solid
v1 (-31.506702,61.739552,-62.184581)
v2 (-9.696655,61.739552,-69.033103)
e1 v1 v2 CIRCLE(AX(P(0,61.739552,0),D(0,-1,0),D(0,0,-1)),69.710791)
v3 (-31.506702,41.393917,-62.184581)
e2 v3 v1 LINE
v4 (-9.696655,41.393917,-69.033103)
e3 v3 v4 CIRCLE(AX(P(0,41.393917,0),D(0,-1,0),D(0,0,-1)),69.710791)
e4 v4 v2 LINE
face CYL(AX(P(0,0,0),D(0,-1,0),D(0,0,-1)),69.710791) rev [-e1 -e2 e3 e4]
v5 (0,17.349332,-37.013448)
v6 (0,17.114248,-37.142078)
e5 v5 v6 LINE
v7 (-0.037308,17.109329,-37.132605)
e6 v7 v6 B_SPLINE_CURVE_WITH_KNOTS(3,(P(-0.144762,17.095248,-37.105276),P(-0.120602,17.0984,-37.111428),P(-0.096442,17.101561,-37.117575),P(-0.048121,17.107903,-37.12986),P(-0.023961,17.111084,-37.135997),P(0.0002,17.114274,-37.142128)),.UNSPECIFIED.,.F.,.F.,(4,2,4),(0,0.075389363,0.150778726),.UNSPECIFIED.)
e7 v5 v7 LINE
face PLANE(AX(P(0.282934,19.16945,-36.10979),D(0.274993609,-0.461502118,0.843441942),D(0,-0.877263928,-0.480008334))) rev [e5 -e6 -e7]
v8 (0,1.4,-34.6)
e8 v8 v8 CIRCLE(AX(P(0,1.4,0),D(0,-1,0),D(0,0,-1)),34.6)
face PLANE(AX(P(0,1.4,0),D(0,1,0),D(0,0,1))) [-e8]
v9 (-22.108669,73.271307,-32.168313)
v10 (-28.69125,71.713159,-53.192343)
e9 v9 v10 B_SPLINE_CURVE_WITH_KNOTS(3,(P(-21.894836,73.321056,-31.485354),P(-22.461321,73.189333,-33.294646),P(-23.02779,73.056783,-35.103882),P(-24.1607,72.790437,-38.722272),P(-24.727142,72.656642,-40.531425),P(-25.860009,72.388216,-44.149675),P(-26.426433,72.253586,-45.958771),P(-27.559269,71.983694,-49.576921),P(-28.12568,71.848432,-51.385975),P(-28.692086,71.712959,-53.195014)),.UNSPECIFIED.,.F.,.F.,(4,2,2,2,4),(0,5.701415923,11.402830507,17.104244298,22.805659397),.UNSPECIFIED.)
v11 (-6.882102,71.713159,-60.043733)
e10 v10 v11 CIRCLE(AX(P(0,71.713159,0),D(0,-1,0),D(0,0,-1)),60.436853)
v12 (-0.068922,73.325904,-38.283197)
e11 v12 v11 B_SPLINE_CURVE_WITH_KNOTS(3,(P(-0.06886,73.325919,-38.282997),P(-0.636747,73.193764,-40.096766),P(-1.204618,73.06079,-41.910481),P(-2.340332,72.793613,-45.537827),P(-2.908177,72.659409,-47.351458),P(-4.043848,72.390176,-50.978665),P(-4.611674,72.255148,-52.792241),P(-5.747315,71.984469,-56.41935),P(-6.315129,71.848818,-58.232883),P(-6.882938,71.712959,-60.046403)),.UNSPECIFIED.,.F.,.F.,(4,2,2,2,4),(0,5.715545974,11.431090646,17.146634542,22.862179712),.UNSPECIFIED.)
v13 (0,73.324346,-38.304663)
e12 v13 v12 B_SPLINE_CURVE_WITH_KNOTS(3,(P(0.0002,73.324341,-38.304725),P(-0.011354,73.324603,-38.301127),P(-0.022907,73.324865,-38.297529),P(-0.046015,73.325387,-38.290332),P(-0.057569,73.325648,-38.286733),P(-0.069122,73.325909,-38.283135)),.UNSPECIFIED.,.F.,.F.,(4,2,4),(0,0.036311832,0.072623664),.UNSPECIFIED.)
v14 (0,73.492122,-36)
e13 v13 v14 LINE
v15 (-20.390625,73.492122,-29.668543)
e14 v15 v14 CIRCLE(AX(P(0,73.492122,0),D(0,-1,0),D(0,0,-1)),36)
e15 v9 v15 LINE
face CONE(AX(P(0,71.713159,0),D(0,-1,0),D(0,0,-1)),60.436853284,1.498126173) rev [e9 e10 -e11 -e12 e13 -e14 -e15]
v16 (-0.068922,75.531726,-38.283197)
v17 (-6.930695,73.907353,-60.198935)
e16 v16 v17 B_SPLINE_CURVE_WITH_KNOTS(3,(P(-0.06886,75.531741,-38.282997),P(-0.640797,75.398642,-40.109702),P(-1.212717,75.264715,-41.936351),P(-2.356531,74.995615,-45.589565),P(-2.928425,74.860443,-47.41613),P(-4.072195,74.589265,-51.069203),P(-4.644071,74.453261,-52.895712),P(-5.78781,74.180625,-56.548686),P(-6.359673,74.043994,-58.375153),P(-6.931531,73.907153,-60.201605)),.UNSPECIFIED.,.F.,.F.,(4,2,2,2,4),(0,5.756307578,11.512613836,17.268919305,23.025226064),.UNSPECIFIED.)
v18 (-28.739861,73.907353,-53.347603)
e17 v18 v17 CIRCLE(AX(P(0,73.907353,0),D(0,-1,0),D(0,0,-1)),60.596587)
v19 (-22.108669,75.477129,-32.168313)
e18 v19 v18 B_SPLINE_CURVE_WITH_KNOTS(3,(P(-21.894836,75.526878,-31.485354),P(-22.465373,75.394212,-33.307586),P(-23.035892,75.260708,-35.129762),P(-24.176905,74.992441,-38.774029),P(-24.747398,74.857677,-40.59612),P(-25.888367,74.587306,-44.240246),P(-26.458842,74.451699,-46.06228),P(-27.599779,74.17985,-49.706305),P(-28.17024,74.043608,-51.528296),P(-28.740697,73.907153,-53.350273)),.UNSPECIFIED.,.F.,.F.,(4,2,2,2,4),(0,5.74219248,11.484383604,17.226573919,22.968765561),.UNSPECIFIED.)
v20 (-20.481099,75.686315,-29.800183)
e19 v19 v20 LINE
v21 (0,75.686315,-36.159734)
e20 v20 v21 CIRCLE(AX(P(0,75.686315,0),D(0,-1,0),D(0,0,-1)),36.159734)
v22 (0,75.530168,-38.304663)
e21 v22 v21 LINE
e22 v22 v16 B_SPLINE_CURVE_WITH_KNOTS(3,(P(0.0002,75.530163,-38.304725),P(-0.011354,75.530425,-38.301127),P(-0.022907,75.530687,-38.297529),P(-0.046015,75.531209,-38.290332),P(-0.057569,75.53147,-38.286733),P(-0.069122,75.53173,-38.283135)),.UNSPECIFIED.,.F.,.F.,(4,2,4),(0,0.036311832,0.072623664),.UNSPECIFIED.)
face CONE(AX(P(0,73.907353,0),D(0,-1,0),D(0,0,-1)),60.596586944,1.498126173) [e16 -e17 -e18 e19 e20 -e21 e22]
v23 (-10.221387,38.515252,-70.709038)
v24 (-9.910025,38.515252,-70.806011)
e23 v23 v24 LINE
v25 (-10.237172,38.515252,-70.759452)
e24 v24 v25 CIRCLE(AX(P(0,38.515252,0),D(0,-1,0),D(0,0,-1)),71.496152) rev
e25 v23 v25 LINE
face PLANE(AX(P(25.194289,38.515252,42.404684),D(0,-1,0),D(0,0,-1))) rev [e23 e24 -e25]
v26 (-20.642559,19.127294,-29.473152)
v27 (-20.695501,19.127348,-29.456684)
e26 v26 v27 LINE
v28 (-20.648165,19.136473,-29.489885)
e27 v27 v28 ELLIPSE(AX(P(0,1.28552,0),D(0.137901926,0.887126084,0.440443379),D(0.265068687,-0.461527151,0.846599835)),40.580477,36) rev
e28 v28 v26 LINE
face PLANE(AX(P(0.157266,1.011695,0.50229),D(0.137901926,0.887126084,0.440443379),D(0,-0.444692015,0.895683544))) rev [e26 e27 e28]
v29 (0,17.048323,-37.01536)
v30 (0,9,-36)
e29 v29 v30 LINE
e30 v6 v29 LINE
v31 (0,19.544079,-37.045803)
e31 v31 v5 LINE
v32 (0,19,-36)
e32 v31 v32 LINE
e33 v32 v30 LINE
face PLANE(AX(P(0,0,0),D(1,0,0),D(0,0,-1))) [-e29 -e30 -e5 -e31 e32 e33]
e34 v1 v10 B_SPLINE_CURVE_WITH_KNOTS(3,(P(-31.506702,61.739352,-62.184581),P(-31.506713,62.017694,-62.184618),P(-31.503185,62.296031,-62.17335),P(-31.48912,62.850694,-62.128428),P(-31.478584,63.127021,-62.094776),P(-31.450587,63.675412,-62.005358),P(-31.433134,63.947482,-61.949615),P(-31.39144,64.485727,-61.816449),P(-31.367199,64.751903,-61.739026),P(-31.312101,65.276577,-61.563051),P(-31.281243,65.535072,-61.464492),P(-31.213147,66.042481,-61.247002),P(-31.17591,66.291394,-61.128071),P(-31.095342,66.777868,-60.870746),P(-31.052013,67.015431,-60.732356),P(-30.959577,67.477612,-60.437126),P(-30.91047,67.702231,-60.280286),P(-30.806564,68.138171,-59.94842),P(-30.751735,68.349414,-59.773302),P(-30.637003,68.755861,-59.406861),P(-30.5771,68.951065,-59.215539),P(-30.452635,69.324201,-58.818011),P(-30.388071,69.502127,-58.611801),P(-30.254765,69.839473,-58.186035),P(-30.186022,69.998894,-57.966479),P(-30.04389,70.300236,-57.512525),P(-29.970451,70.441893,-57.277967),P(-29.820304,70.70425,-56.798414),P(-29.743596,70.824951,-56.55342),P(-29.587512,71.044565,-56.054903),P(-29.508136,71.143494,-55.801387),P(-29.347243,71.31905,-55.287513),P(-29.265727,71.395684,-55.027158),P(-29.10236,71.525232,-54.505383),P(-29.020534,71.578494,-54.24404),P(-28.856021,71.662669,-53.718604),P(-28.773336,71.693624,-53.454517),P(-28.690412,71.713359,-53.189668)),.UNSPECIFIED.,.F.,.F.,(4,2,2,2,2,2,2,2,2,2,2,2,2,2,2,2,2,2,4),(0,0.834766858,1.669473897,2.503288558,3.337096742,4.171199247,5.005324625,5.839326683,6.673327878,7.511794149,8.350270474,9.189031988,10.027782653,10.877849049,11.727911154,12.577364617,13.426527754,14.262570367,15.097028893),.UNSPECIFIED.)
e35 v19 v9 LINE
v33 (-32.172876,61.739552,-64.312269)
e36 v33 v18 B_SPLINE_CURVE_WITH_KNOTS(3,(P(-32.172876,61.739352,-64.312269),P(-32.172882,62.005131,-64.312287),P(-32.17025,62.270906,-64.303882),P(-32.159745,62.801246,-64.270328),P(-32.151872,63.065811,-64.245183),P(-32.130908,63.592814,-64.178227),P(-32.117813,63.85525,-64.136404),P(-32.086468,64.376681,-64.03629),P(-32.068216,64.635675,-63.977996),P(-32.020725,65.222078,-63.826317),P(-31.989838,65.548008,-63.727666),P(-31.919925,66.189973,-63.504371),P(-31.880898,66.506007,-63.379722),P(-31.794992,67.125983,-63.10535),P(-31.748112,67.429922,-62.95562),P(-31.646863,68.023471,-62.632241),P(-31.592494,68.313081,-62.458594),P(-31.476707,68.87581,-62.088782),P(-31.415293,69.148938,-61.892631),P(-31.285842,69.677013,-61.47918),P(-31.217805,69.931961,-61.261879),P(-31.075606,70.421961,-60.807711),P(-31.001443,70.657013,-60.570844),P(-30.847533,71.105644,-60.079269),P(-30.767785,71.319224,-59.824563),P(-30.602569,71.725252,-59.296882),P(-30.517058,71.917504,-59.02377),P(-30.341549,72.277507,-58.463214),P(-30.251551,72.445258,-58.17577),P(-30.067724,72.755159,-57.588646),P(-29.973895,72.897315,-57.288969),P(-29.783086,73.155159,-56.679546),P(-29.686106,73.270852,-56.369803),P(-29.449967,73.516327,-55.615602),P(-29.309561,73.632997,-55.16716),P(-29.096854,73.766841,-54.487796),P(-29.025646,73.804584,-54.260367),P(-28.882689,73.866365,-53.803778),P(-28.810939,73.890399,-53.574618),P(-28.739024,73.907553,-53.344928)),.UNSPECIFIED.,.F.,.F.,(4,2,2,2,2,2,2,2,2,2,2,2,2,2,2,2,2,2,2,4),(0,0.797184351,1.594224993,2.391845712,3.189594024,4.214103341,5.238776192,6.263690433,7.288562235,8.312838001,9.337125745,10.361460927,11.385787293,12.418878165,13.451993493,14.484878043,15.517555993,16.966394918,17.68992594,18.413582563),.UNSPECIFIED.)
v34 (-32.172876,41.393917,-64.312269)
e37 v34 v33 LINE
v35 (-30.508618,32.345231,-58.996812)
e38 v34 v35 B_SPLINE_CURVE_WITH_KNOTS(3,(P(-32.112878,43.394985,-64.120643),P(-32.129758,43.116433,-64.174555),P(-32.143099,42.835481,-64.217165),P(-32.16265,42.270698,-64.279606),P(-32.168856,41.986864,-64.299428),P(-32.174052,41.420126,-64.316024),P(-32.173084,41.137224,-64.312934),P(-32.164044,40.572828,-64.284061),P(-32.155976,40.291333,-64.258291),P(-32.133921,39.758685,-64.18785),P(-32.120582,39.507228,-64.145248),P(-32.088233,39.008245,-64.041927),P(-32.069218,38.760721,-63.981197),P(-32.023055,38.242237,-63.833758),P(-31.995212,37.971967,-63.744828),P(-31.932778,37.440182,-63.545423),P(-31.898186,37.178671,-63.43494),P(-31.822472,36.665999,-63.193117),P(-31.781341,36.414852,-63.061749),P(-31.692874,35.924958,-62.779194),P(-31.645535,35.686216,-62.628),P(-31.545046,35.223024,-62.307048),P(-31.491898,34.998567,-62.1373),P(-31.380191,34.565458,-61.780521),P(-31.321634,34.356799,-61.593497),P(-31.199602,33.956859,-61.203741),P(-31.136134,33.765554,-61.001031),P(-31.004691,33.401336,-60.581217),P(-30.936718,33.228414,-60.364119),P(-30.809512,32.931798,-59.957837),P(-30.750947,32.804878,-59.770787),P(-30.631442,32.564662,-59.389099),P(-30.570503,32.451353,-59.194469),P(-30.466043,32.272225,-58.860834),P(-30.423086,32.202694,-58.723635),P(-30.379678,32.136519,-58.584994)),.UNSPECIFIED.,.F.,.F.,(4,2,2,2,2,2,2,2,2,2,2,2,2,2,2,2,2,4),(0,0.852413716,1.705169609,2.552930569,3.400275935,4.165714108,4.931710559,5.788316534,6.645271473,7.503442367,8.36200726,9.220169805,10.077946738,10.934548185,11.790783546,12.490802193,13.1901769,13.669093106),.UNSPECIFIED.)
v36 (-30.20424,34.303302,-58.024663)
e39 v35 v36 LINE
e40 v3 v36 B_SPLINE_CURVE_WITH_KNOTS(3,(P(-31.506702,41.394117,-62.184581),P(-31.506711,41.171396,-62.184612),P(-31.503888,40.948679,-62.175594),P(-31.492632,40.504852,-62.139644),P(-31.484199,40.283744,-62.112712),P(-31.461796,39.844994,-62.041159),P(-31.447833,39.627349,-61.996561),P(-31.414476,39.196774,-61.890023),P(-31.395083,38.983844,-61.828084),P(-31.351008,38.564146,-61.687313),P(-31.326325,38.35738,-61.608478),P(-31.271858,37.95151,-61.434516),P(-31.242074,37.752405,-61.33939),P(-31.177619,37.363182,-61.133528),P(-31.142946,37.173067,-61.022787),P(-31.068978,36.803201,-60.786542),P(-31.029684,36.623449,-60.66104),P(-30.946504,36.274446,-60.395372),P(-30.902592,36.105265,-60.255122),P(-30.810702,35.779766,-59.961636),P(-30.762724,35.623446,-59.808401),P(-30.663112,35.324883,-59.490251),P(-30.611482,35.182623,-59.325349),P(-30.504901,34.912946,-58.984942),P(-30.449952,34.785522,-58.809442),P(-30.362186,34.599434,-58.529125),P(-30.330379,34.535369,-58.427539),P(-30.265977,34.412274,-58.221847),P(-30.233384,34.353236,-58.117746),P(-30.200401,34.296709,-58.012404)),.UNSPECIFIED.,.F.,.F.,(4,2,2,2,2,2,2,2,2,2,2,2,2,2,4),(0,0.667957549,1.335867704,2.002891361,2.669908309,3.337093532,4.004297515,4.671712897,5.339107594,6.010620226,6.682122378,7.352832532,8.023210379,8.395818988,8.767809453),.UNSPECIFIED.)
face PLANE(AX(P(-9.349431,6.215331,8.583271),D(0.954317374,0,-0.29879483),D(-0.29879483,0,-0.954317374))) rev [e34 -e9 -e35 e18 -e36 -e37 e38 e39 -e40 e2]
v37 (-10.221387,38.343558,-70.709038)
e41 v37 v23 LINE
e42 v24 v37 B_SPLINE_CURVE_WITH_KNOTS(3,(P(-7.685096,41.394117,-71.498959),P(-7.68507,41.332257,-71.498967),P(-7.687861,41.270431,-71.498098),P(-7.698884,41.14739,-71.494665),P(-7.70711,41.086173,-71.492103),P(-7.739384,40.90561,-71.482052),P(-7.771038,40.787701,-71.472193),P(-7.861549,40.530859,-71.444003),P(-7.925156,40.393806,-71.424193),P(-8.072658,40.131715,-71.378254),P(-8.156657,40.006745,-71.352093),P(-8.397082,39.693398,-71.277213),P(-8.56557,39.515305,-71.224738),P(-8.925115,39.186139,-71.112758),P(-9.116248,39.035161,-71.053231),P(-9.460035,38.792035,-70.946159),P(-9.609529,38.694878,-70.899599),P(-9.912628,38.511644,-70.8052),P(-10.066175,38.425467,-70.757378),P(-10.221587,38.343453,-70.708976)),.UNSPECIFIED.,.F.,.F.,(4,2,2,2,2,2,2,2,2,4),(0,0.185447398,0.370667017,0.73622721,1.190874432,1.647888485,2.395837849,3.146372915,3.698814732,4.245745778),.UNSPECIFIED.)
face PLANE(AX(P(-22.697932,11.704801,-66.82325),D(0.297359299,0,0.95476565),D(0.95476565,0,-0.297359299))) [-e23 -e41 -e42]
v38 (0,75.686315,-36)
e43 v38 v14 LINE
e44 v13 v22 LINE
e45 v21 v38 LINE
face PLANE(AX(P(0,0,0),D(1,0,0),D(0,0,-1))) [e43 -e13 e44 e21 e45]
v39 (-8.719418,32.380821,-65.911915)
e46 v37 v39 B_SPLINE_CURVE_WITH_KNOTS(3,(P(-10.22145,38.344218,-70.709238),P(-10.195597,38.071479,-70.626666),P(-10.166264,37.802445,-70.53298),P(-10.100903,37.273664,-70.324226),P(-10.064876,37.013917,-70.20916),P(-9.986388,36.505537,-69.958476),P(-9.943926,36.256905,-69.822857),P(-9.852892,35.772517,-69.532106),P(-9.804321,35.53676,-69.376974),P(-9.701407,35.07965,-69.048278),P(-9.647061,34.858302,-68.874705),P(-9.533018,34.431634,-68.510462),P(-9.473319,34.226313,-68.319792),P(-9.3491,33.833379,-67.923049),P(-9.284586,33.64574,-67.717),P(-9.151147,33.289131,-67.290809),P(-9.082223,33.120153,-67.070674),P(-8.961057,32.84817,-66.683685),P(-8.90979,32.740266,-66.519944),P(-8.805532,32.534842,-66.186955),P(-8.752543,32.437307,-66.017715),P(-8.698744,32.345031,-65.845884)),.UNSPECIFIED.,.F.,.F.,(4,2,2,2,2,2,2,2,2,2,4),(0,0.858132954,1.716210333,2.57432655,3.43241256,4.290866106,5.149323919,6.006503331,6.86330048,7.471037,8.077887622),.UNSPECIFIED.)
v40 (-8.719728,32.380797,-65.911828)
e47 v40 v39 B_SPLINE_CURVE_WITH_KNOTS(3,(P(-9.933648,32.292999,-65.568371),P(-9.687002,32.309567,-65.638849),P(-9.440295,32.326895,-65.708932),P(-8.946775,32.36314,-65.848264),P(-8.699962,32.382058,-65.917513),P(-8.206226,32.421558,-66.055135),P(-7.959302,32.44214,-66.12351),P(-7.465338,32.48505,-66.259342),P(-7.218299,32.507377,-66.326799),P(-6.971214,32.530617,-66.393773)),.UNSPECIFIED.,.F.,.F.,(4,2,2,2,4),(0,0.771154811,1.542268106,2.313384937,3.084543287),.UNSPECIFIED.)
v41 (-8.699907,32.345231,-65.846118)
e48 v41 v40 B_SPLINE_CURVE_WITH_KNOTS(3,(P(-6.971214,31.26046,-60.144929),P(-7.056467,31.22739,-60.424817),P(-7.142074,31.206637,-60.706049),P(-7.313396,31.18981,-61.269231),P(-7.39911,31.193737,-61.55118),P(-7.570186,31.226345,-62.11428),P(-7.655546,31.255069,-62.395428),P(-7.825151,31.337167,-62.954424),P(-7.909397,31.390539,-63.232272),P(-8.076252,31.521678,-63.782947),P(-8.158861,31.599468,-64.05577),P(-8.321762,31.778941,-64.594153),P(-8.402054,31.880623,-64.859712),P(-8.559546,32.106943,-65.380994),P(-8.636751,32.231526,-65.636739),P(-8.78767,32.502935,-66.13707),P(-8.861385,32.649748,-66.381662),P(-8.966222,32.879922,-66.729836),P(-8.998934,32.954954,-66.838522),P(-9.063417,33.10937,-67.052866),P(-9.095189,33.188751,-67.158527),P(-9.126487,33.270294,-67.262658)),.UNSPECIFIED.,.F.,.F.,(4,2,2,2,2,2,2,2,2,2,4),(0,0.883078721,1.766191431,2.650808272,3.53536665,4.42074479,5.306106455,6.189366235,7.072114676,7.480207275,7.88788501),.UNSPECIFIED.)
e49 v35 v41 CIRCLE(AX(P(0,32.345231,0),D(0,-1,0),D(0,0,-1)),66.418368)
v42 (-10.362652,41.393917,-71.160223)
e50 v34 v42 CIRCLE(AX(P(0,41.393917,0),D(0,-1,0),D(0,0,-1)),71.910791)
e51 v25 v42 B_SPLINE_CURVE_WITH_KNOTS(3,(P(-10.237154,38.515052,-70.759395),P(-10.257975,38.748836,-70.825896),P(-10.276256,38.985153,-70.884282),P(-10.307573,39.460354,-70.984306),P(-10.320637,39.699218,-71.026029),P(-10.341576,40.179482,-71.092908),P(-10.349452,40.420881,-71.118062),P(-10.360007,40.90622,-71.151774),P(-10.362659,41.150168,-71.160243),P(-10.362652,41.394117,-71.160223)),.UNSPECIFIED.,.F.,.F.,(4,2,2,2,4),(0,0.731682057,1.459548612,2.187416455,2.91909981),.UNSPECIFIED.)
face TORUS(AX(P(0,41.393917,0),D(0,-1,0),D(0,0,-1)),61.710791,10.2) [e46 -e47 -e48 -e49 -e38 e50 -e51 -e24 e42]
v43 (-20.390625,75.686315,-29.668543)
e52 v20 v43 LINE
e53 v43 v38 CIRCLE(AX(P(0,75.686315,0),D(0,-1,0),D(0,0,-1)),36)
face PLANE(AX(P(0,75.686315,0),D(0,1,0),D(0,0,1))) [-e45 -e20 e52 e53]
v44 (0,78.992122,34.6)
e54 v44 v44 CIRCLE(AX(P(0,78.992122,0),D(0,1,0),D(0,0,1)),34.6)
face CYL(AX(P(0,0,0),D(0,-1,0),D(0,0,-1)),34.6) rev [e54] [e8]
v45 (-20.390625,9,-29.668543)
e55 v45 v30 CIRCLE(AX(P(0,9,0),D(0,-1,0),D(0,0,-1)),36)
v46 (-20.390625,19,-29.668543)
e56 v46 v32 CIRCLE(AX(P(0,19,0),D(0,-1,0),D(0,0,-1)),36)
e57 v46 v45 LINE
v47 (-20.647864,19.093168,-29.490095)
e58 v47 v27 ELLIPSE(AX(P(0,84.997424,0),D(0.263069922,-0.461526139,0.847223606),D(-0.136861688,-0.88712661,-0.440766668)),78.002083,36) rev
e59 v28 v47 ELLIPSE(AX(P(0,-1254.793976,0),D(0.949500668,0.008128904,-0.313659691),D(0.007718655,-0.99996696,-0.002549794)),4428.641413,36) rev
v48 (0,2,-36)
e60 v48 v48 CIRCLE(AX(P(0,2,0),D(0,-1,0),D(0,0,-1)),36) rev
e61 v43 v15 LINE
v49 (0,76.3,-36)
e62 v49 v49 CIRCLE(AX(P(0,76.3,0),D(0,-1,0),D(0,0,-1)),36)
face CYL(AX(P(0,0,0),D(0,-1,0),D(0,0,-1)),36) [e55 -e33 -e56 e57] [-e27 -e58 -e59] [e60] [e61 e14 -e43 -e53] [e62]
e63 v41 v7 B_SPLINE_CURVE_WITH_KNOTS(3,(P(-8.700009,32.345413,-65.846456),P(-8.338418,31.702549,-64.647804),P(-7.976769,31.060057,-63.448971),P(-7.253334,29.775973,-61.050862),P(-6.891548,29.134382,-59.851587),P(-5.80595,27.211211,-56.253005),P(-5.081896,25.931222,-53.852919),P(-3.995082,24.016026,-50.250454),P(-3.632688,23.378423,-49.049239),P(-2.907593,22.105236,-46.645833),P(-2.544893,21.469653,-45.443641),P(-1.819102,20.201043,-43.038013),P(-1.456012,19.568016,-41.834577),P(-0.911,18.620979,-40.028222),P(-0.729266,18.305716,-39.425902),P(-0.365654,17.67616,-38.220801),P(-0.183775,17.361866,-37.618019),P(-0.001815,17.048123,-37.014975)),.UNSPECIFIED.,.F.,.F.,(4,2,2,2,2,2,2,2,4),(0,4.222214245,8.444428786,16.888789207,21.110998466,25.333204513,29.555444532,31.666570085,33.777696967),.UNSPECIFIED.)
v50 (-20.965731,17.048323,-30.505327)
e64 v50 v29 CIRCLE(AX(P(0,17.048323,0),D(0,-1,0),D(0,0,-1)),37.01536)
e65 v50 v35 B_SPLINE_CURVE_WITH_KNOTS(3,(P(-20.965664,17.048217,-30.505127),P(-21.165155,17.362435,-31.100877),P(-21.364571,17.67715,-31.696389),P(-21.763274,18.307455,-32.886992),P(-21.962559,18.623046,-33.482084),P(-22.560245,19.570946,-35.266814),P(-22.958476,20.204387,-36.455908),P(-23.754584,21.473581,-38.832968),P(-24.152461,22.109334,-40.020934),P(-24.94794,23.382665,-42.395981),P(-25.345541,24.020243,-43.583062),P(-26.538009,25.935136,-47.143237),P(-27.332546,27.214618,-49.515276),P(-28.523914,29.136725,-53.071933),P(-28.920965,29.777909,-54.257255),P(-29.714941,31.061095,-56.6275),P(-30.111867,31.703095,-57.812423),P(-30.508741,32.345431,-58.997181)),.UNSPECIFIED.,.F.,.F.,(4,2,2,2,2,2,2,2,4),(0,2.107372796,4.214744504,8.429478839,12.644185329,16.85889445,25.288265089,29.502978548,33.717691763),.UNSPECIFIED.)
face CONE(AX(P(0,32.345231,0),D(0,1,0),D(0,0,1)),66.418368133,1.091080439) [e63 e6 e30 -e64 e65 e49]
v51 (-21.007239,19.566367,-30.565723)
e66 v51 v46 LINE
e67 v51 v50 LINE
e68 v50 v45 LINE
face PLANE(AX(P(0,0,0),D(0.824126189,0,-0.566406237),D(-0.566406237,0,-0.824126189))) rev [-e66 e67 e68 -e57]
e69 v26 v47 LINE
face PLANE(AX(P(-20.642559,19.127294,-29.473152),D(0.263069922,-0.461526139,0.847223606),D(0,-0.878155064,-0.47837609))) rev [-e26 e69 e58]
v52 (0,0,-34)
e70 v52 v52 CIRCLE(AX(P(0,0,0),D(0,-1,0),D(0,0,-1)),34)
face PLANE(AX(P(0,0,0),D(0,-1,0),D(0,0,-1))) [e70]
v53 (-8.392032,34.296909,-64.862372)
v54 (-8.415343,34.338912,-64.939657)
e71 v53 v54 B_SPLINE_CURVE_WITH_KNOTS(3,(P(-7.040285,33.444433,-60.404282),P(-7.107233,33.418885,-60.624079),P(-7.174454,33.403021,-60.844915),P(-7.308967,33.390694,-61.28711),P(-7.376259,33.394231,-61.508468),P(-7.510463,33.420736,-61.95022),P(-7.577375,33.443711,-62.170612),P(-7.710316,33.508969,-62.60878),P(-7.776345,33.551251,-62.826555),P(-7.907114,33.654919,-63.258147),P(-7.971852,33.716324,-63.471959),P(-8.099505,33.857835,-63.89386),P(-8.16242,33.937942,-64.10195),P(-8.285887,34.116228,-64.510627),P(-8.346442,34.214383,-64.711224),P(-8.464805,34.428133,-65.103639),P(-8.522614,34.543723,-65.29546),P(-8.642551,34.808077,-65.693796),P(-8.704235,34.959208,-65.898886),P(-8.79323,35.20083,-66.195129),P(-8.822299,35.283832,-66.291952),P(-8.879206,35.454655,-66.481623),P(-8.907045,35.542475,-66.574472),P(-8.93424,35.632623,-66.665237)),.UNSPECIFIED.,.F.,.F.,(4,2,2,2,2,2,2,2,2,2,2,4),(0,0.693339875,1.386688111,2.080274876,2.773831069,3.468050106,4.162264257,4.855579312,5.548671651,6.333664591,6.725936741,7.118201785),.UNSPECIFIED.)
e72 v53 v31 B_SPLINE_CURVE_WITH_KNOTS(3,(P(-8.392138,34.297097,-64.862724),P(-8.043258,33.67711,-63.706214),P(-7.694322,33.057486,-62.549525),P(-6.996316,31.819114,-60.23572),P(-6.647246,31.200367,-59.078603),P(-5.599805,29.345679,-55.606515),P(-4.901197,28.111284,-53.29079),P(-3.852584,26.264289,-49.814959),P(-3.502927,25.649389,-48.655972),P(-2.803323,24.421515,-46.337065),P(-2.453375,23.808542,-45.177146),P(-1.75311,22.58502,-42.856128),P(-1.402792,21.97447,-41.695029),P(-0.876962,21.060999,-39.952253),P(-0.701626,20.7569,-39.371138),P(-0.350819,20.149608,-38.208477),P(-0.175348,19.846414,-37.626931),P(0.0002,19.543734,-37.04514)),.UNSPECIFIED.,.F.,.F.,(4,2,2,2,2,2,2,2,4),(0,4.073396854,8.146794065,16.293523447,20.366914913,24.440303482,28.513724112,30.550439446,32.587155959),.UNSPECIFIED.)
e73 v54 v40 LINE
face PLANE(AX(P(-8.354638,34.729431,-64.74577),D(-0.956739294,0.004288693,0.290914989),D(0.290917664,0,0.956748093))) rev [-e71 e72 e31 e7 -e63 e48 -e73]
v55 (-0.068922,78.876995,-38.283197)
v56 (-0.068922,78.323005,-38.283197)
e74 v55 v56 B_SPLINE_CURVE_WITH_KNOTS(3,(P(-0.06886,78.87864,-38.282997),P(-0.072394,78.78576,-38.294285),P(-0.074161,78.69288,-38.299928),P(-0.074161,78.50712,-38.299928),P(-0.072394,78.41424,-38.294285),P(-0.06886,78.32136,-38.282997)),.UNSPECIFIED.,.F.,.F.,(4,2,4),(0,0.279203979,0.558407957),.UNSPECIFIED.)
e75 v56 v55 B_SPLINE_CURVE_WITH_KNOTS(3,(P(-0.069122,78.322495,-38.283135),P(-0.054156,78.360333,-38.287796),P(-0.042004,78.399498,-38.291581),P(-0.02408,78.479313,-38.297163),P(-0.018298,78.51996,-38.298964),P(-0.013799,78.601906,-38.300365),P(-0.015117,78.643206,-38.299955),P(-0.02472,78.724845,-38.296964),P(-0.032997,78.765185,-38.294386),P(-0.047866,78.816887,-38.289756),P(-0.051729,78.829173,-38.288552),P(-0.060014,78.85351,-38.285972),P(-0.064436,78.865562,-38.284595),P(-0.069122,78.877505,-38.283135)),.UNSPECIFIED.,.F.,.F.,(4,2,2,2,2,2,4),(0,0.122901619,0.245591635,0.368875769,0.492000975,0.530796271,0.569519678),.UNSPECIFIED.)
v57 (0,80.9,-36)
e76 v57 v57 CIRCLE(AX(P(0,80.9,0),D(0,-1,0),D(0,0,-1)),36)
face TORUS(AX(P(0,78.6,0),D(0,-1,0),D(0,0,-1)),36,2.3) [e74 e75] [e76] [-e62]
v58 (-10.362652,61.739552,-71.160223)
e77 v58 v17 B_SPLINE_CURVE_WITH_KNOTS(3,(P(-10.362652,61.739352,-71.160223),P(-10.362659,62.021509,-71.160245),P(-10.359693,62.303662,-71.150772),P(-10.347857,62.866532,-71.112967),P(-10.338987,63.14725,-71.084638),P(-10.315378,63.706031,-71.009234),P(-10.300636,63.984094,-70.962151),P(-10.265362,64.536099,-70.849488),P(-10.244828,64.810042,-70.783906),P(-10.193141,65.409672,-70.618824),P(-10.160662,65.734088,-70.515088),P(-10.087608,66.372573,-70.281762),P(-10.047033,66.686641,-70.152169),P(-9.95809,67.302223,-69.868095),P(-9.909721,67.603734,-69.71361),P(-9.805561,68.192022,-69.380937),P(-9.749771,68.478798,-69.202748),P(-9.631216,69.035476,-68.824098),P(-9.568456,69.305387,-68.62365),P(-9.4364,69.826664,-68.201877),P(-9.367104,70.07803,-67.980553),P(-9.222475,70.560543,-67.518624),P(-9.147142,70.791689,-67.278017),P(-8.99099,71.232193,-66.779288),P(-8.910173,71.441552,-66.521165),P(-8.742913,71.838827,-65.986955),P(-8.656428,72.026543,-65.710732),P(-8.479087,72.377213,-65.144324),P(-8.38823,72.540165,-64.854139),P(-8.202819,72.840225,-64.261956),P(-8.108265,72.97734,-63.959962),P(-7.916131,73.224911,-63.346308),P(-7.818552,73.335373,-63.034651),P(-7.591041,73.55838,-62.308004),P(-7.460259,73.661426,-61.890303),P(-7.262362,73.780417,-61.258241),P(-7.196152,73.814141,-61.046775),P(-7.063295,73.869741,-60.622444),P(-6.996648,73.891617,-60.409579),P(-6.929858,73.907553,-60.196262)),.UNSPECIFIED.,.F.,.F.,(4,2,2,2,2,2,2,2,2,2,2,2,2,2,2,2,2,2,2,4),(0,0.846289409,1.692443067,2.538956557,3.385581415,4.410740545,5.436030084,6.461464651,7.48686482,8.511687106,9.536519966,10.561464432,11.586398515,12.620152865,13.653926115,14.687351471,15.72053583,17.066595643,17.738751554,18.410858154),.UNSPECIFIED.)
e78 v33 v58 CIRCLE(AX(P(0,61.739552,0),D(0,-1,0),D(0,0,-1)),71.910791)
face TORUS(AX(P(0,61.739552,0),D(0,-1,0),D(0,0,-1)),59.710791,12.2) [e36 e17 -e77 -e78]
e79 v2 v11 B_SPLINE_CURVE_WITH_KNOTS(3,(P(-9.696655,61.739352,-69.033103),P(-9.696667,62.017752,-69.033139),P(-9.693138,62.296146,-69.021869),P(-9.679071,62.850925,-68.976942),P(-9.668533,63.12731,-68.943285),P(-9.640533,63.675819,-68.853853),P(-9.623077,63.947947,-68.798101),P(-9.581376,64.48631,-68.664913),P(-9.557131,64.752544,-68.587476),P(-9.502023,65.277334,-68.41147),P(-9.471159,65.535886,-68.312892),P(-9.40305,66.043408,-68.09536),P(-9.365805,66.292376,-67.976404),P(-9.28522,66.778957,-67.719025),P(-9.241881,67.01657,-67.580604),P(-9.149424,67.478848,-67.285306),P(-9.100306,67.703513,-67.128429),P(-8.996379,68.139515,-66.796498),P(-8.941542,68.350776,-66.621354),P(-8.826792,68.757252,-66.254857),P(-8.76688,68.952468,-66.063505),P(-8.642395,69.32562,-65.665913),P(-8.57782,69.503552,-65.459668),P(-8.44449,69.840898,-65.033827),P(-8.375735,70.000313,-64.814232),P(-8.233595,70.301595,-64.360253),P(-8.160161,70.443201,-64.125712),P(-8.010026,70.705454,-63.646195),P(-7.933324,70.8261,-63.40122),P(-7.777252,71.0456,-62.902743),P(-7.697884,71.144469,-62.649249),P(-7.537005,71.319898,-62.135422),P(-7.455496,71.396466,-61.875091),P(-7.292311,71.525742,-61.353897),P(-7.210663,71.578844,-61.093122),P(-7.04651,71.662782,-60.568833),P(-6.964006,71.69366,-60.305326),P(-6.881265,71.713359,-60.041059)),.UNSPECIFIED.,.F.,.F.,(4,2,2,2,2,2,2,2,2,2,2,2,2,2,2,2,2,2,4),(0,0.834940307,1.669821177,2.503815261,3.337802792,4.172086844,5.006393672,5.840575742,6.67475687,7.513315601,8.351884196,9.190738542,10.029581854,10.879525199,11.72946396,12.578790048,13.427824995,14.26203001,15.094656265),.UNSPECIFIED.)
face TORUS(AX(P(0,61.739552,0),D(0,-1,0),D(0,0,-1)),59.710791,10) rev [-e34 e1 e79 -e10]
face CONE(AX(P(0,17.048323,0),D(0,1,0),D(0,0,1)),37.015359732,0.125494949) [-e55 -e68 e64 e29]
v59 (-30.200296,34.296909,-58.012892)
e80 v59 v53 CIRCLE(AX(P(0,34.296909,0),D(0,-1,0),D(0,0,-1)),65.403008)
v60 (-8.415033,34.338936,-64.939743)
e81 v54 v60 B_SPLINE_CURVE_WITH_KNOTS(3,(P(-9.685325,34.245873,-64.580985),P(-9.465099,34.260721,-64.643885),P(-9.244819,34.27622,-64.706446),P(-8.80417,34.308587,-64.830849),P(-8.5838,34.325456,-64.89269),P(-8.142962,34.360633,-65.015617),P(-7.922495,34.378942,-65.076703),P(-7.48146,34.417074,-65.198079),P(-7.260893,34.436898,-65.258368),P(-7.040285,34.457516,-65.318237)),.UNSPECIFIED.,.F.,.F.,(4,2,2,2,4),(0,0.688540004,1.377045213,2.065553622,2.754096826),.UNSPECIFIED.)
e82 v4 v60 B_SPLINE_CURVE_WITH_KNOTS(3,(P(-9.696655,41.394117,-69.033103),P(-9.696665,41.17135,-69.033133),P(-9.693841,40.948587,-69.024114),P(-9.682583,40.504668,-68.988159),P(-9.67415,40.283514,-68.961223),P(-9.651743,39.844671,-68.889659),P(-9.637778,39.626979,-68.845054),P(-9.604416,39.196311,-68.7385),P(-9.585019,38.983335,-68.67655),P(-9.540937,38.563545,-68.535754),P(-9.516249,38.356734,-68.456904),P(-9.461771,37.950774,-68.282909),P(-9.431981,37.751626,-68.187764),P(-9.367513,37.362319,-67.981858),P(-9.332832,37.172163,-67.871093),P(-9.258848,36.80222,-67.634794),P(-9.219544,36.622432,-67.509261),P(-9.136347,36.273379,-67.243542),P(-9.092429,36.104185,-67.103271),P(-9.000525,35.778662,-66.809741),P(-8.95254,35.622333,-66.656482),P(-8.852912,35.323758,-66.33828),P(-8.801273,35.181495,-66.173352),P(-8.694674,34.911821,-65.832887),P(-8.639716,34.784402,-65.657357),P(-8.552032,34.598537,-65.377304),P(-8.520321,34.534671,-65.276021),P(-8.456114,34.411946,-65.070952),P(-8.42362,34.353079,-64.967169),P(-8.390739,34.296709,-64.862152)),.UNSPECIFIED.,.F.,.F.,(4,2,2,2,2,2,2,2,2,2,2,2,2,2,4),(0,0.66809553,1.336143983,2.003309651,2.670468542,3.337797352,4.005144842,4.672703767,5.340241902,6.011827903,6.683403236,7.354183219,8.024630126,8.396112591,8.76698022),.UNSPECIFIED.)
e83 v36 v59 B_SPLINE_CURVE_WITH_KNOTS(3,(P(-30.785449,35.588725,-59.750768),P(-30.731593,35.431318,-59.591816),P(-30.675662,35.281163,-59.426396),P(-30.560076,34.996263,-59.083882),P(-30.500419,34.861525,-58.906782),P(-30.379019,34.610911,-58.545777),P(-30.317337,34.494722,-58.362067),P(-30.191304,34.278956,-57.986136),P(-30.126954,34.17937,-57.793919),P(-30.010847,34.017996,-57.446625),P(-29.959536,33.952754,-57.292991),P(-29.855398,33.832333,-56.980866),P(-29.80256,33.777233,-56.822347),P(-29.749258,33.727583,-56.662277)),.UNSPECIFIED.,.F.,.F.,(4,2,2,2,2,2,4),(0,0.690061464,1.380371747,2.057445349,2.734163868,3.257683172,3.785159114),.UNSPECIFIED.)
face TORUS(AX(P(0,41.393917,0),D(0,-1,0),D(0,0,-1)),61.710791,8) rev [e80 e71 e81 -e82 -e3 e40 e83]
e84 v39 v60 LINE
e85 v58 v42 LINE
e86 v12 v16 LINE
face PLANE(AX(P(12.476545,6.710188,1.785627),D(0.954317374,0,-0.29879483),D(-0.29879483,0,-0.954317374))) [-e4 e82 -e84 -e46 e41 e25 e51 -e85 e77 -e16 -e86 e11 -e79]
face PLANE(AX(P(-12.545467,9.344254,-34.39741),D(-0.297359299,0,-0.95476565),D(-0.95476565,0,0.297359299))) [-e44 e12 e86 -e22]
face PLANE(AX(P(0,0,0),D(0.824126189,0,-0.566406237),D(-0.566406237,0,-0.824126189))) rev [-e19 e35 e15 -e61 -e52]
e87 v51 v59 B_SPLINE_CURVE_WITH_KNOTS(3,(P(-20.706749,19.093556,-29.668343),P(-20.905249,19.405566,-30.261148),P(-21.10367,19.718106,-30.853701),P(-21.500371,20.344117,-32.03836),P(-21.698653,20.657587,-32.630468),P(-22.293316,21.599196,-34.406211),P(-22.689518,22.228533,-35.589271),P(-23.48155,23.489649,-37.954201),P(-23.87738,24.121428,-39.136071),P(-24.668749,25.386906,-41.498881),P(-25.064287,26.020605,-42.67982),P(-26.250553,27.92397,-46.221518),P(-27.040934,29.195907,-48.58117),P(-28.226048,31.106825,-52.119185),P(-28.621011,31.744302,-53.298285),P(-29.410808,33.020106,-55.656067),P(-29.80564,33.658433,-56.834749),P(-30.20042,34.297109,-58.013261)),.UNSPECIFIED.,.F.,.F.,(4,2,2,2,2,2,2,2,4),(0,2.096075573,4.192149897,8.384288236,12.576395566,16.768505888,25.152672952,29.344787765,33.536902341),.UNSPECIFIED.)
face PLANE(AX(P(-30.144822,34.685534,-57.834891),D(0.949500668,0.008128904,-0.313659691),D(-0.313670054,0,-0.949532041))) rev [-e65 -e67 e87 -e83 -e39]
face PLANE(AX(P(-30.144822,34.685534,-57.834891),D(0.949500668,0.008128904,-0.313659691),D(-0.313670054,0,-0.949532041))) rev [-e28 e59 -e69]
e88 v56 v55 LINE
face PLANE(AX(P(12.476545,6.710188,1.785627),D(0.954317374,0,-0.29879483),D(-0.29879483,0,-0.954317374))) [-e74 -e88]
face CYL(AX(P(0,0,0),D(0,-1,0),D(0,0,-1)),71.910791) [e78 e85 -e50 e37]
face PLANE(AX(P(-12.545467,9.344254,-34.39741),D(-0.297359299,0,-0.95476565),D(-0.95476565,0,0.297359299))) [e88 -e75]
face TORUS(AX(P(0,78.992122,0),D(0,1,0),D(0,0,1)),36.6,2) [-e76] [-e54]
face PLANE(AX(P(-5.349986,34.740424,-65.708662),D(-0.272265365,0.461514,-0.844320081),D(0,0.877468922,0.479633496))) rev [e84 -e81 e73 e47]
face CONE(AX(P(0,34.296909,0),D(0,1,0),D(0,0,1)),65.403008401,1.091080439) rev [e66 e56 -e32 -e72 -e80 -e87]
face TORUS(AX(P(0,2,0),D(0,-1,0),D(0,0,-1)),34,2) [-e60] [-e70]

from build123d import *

# Parameters (mm, degrees)
FILLET1_R          = 2
FILLET2_R          = 2
REVOLVE3_ANGLE     = 34.5
CUT_EXTRUDE1_START = 17.048322615
CUT_EXTRUDE1_DEPTH = 62.951677385
CUT_EXTRUDE2_REACH = 148.807
SKETCH6_W          = 2.656451676
SKETCH6_H          = 26.566734065
SKETCH6_W_2        = 2.656451675
CUT_EXTRUDE4_DEPTH = 3.1


with BuildPart() as part:
    # Sketch3 → Revolve2 (revolve)
    with BuildSketch(Plane(origin=(0, 0, 0), x_dir=(0, 0, -1), z_dir=(1, 0, 0))):
        with BuildLine():
            Line((0, 0), (36, 0))
            Line((36, 0), (36, 76.3))
            ThreePointArc((36, 76.3), (38.3, 78.6), (36, 80.9))
            Line((36, 80.9), (34.6, 80.9))
            Line((34.6, 80.9), (34.6, 76.3))
            Line((34.6, 76.3), (34.6, 1.4))
            Line((34.6, 1.4), (0, 1.4))
            Line((0, 1.4), (0, 0))
        make_face()
    revolve(axis=Axis((0, 0, 0), (0, 1, 0)))

    # Fillet1
    # the kernel refuses this fillet: 2 mm, written as the material it takes off along each edge
    with BuildSketch(Plane(origin=(0, 80.9, 0), x_dir=(0, 0, -1), z_dir=(1, 0, 0))) as fillet1_piece_1:
        with BuildLine():
            CenterArc((36.6, -1.907878403), FILLET1_R, 107.457603124, 72.542396876)
            Line((34.6, -1.907878403), (34.56, -1.907878403))
            Line((34.56, -1.907878403), (34.56, 0))
            Line((34.56, 0), (34.6, 0.04))
            ThreePointArc((34.6, 0.04), (35.3, 0.04), (35.988, 0.038157568))
            Line((35.988, 0.038157568), (36, 0))
        make_face()
    revolve(axis=Axis((0, 80.9, 0), (0, 1, 0)), mode=Mode.SUBTRACT)

    # Fillet2
    fillet2_edges = [part.edges().sort_by_distance(p)[0] for p in [
        (0, 0, 36),
    ]]
    fillet(fillet2_edges, radius=FILLET2_R)

    # Sketch4 → Revolve3 (revolve)
    with BuildSketch(Plane(origin=(0, 0, 0), x_dir=(0, 0, -1), z_dir=(1, 0, 0))):
        with BuildLine():
            Line((66.418368133, 32.345231294), (37.015359732, 17.048322615))
            Line((37.015359732, 17.048322615), (36, 9))
            Line((36, 9), (36, 19))
            Line((36, 19), (65.403008401, 34.296908679))
            ThreePointArc((65.403008401, 34.296908679), (68.549568046, 37.242877581), (69.710791194, 41.393917351))
            Line((69.710791194, 41.393917351), (69.710791194, 61.739552218))
            ThreePointArc((69.710791194, 61.739552218), (67.034063035, 68.549081537), (60.436853284, 71.71315908))
            Line((60.436853284, 71.71315908), (36, 73.492121597))
            Line((36, 73.492121597), (36, 75.686315107))
            Line((36, 75.686315107), (36.15973366, 75.686315107))
            Line((36.15973366, 75.686315107), (60.596586944, 73.90735259))
            ThreePointArc((60.596586944, 73.90735259), (68.64518284, 70.047177987), (71.910791194, 61.739552218))
            Line((71.910791194, 61.739552218), (71.910791194, 41.393917351))
            ThreePointArc((71.910791194, 41.393917351), (70.43023168, 36.101341644), (66.418368133, 32.345231294))
        make_face()
    revolve(axis=Axis((0, 0, 0), (0, 1, 0)), revolution_arc=REVOLVE3_ANGLE)

    # Cut-Extrude1: read off the stored shape, not the designer's step
    # Cut-Extrude1 outline → Cut-Extrude1 (cut)
    with BuildSketch(Plane(origin=(0, 0, 0), x_dir=(1, 0, 0), z_dir=(0, 1, 0)).offset(CUT_EXTRUDE1_START)):
        with BuildLine():
            Line((-22.108668816, 32.168312739), (-32.047363038, 63.91139403))
            Line((-32.047363038, 63.91139403), (-34.272292741, 63.218445413))
            ThreePointArc((-34.272292741, 63.218445413), (-37.553605301, 61.326084329), (-40.730720635, 59.263566268))
            Line((-40.730720635, 59.263566268), (-22.108668816, 32.168312739))
        make_face()
        with BuildLine():
            Line((0, 38.304663112), (0, 71.910791194))
            ThreePointArc((0, 71.910791194), (-3.848061143, 71.807759438), (-7.685095499, 71.498959414))
            Line((-7.685095499, 71.498959414), (-10.221387179, 70.709037913))
            Line((-10.221387179, 70.709037913), (-0.068922433, 38.283197398))
            Line((-0.068922433, 38.283197398), (0, 38.304663112))
        make_face()
    extrude(amount=CUT_EXTRUDE1_DEPTH, mode=Mode.SUBTRACT)

    # Cut-Extrude2: up to this plane
    cut_extrude2_end = Plane(origin=(-22.697932128, 11.704801269, -66.823250171), z_dir=(0.2973592990807489, 0, 0.9547656504348101))
    # Sketch6 → Cut-Extrude2 (cut, up to the surface)
    with BuildSketch(Plane(origin=(-21.486572607, 0, -68.625717394), x_dir=(-0.9543173737069837, 0, 0.2987948296758254), z_dir=(-0.2987948296758254, 0, -0.9543173737069837)), mode=Mode.PRIVATE) as cut_extrude2_sk1:
        with Locations((-12.701273409, 51.798619412)):
            Rectangle(SKETCH6_W, SKETCH6_H)
    cut_extrude2_tool1 = split(extrude(cut_extrude2_sk1.sketch, amount=-CUT_EXTRUDE2_REACH, mode=Mode.PRIVATE), bisect_by=cut_extrude2_end, keep=Keep.BOTH, mode=Mode.PRIVATE)
    add(cut_extrude2_tool1.solids().sort_by_distance((-9.365527, 51.798619, -72.420792))[0], mode=Mode.SUBTRACT)
    # Sketch6 → Cut-Extrude2 (cut, up to the surface)
    with BuildSketch(Plane(origin=(-21.486572607, 0, -68.625717394), x_dir=(-0.9543173737069837, 0, 0.2987948296758254), z_dir=(-0.2987948296758254, 0, -0.9543173737069837)), mode=Mode.PRIVATE) as cut_extrude2_sk2:
        with Locations((12.815187073, 51.798619412)):
            Rectangle(SKETCH6_W_2, SKETCH6_H)
    cut_extrude2_tool2 = split(extrude(cut_extrude2_sk2.sketch, amount=-CUT_EXTRUDE2_REACH, mode=Mode.PRIVATE), bisect_by=cut_extrude2_end, keep=Keep.BOTH, mode=Mode.PRIVATE)
    add(cut_extrude2_tool2.solids().sort_by_distance((-33.716328, 51.798619, -64.796606))[0], mode=Mode.SUBTRACT)

    # Sketch7 → Cut-Extrude4 (cut)
    with BuildSketch(Plane(origin=(-0.27023011, -1.738396159, -0.863084843), x_dir=(-0.9904458888228052, 0.12351648622229915, 0.06132388560177964), z_dir=(-0.13790192643325755, -0.8871260840574537, -0.4404433785072538))):
        Polygon((30.594390354, 67.226140182), (21.000465395, 34.90437265), (24.682862396, 33.889860102), (33.633833507, 66.37938352), align=None)
        Polygon((5.560376818, 74.302956644), (8.594011842, 73.435621609), (-0.126879919, 40.867445433), (-3.796298497, 41.927940925), align=None)
    extrude(amount=-CUT_EXTRUDE4_DEPTH, mode=Mode.SUBTRACT)


solid = part.part
